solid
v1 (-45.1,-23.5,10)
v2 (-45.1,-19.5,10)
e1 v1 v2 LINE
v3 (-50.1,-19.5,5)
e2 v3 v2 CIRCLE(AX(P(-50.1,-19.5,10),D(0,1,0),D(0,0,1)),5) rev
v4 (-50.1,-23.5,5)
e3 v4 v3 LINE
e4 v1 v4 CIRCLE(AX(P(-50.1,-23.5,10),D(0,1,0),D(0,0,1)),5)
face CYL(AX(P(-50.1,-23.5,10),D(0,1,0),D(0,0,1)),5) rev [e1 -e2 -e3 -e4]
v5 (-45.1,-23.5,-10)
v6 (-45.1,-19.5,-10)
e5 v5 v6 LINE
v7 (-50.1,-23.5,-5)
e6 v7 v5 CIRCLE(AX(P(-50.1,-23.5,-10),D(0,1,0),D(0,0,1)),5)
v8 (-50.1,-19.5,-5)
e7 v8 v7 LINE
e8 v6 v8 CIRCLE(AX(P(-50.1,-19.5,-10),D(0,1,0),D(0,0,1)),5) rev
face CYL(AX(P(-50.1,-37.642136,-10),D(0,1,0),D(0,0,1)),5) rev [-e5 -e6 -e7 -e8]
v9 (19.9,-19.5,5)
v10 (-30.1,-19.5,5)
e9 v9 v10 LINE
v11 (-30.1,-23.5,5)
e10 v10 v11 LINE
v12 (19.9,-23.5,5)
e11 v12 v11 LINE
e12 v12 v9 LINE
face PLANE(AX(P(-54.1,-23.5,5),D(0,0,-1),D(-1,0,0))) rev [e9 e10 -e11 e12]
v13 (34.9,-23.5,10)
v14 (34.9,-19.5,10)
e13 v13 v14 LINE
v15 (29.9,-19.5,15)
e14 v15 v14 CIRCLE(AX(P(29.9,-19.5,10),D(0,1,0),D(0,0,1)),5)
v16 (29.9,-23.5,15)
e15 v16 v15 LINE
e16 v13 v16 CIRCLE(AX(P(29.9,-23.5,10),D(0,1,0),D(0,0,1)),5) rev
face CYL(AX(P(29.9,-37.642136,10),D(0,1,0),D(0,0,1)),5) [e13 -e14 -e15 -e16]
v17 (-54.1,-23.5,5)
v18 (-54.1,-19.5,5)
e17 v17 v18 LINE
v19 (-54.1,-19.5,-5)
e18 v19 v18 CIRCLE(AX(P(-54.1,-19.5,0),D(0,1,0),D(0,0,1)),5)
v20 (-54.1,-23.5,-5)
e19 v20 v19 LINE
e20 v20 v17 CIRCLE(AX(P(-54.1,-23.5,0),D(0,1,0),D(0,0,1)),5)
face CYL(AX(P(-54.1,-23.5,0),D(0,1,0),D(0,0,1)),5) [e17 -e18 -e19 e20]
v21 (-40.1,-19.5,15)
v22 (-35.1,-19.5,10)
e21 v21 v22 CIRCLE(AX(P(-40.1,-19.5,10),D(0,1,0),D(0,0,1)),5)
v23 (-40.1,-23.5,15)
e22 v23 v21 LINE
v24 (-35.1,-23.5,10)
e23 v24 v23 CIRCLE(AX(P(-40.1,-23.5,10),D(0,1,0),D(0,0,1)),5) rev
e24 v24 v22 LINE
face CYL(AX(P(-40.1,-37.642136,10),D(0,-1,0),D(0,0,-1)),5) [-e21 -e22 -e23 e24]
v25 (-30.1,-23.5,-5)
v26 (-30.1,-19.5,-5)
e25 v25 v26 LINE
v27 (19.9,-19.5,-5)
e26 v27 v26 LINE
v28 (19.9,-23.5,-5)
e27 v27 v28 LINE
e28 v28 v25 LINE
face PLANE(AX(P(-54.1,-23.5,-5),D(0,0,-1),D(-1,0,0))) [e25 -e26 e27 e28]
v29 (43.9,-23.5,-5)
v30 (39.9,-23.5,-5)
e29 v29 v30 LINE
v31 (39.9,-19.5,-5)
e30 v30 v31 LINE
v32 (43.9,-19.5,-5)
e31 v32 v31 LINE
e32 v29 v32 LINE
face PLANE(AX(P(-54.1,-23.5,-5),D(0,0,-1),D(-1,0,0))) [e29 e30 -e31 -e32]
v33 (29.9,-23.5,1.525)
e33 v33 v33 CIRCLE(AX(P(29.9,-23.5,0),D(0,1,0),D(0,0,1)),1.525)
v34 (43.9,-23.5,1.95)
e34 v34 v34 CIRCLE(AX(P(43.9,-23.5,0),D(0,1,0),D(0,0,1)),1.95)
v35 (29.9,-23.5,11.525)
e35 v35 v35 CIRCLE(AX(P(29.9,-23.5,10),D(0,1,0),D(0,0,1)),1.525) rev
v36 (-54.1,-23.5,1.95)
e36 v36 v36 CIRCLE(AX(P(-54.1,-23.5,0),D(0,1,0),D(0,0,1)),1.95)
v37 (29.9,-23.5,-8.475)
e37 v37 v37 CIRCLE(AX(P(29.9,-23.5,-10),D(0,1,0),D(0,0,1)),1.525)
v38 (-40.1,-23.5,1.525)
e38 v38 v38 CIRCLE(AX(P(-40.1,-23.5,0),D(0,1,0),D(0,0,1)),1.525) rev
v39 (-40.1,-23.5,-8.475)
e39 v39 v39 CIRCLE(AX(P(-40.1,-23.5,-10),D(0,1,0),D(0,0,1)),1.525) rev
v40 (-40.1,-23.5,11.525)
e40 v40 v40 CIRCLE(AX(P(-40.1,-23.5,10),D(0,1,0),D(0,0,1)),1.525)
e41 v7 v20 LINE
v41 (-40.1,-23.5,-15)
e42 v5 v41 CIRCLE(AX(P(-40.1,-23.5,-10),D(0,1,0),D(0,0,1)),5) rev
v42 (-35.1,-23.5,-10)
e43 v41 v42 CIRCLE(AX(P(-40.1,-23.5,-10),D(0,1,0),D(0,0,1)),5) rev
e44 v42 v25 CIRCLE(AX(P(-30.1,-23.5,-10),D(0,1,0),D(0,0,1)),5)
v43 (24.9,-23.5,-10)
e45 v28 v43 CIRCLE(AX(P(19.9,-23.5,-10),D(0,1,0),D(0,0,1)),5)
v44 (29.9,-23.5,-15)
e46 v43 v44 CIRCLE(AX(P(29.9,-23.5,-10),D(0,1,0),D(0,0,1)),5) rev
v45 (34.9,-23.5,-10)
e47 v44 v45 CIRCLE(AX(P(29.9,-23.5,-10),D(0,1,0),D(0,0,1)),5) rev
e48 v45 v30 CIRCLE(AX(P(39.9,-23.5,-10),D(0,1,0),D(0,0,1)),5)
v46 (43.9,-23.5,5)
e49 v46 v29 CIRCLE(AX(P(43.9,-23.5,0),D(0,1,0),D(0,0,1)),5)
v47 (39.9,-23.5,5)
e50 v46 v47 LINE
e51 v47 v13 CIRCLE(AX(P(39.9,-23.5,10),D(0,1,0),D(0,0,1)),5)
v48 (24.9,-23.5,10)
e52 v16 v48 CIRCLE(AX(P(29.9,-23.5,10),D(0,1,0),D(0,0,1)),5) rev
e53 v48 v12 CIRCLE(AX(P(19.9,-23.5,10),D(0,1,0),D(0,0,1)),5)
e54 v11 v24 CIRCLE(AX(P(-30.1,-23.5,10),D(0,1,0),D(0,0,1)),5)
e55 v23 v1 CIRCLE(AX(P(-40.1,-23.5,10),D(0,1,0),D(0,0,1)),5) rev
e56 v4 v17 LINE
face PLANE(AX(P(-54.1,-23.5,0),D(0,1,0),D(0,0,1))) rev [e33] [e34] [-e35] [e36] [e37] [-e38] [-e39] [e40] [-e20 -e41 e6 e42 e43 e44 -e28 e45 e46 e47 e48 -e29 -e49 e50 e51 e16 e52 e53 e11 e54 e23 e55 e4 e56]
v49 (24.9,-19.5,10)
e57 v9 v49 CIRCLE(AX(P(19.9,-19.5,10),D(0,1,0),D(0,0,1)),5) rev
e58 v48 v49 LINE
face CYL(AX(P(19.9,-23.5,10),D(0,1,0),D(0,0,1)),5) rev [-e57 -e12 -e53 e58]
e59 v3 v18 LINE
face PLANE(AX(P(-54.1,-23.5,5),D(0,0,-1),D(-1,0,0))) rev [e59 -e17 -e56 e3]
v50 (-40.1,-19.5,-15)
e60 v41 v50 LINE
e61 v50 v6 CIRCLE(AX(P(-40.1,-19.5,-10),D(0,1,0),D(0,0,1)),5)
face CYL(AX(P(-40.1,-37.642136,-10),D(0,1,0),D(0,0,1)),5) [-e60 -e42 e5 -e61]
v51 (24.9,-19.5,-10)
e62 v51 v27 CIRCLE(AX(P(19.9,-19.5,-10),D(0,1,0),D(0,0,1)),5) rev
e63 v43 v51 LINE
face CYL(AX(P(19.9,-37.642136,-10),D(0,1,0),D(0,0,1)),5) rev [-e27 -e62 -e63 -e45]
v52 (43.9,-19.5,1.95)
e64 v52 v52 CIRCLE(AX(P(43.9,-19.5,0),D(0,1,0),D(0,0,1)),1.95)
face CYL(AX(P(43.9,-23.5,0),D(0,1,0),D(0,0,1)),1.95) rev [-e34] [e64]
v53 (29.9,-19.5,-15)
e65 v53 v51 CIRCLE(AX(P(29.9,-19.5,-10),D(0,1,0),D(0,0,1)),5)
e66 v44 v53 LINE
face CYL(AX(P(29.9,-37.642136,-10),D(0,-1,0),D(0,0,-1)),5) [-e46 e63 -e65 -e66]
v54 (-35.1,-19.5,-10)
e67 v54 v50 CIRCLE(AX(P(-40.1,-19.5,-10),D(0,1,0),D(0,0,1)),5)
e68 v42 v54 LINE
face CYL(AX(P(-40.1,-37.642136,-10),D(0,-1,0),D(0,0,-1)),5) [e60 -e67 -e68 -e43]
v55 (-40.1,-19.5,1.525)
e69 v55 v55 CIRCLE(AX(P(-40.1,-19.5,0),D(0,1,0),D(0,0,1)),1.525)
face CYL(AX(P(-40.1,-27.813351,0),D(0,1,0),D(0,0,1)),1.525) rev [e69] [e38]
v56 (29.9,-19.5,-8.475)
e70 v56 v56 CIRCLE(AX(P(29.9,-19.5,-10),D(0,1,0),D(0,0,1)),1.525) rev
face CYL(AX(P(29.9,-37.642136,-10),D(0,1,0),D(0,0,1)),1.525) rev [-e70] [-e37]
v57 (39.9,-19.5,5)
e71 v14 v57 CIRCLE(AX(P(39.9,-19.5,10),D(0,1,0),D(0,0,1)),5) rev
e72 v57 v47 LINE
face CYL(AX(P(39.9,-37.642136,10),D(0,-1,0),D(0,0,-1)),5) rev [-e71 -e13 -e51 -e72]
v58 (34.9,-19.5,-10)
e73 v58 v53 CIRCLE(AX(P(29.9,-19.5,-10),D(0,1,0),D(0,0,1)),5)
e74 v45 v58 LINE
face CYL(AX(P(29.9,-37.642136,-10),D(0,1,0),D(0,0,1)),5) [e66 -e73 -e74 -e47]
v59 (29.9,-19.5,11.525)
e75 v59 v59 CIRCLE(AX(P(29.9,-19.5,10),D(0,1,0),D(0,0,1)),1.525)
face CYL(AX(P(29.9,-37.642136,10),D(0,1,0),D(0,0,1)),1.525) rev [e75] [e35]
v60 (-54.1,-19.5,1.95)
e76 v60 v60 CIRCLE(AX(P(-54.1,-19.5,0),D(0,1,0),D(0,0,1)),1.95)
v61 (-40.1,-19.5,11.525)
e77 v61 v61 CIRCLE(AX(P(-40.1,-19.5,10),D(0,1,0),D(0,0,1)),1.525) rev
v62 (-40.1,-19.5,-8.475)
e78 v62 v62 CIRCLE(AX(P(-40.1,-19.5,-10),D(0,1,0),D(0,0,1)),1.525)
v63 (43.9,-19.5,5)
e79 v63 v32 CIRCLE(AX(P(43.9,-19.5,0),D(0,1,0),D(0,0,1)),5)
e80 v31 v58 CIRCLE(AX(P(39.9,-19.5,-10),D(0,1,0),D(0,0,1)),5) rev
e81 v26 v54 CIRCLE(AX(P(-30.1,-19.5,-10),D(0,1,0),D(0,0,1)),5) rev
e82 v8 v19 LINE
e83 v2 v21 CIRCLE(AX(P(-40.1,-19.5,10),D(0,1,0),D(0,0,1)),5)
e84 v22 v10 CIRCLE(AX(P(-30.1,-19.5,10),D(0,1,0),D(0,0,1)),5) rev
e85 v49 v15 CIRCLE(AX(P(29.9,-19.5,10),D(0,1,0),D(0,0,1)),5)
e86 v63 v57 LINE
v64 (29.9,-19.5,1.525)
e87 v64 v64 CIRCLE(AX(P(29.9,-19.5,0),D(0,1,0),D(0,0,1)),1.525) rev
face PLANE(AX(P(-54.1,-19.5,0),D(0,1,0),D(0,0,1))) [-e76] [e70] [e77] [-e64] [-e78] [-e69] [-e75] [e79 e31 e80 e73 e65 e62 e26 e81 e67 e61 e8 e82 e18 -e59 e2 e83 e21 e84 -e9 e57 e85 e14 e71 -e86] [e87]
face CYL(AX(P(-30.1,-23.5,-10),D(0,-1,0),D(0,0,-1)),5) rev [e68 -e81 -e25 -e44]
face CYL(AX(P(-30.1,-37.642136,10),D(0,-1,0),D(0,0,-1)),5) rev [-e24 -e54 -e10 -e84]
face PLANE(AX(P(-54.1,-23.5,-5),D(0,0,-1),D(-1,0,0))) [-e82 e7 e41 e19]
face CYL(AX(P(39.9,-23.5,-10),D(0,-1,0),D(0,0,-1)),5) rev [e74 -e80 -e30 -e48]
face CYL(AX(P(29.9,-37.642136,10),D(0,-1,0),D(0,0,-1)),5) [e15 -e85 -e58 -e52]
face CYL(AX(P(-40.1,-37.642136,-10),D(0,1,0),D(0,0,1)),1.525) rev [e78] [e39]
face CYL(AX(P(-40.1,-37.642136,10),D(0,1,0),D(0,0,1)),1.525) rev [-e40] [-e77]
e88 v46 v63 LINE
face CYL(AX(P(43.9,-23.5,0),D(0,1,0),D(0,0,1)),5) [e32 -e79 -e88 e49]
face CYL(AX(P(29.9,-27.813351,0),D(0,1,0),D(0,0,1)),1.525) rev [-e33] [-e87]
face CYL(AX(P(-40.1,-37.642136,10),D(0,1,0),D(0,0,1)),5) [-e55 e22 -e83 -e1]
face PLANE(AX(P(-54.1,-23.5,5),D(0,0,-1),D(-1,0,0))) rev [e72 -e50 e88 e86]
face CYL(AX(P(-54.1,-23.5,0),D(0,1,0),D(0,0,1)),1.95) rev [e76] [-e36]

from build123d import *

# Parameters (mm, degrees)
BOSS_EXTRUDE1_START = -19.5
SKETCH1_R           = 1.95
BOSS_EXTRUDE1_DEPTH = 4
SKETCH2_W           = 10
SKETCH2_H           = 10
SKETCH2_R           = 1.525
BOSS_EXTRUDE2_DEPTH = 4
SKETCH2_3_R         = 1.525
CUT_EXTRUDE1_DEPTH  = 4
FILLET1_START       = -24
FILLET1_DEPTH       = 5
FILLET1_START_2     = -23.5
FILLET1_2_DEPTH     = 4


with BuildPart() as part:
    # Sketch1 → Boss-Extrude1 (new body)
    with BuildSketch(Plane(origin=(0, 0, 0), x_dir=(1, 0, 0), z_dir=(0, 1, 0)).offset(BOSS_EXTRUDE1_START)):
        with BuildLine():
            Line((43.9, 5), (-54.1, 5))
            ThreePointArc((-54.1, 5), (-59.1, 0), (-54.1, -5))
            Line((-54.1, -5), (43.9, -5))
            ThreePointArc((43.9, -5), (48.9, 0), (43.9, 5))
        make_face()
        with Locations(Location((43.9, 0, 0), (0, 0, 270))):
            Circle(SKETCH1_R, mode=Mode.SUBTRACT)
        with Locations(Location((-54.1, 0, 0), (0, 0, 270))):
            Circle(SKETCH1_R, mode=Mode.SUBTRACT)
    extrude(amount=-BOSS_EXTRUDE1_DEPTH)

    # Sketch2 → Boss-Extrude2 (add)
    # profile 1 of 4: a face of its own
    with BuildSketch(Plane(origin=(0, -19.5, 0), x_dir=(1, 0, 0), z_dir=(0, 1, 0))):
        with Locations((-40.1, -10)):
            Rectangle(SKETCH2_W, SKETCH2_H)
        with Locations(Location((-40.1, -10, 0), (0, 0, 270))):
            Circle(SKETCH2_R, mode=Mode.SUBTRACT)
    # profile 2 of 4: a face of its own
    with BuildSketch(Plane(origin=(0, -19.5, 0), x_dir=(1, 0, 0), z_dir=(0, 1, 0))):
        with Locations((-40.1, 10)):
            Rectangle(SKETCH2_W, SKETCH2_H)
        with Locations(Location((-40.1, 10, 0), (0, 0, 270))):
            Circle(SKETCH2_R, mode=Mode.SUBTRACT)
    # profile 3 of 4: a face of its own
    with BuildSketch(Plane(origin=(0, -19.5, 0), x_dir=(1, 0, 0), z_dir=(0, 1, 0))):
        with Locations((29.9, 10)):
            Rectangle(SKETCH2_W, SKETCH2_H)
        with Locations(Location((29.9, 10, 0), (0, 0, 270))):
            Circle(SKETCH2_R, mode=Mode.SUBTRACT)
    # profile 4 of 4: a face of its own
    with BuildSketch(Plane(origin=(0, -19.5, 0), x_dir=(1, 0, 0), z_dir=(0, 1, 0))):
        with Locations((29.9, -10)):
            Rectangle(SKETCH2_W, SKETCH2_H)
        with Locations(Location((29.9, -10, 0), (0, 0, 270))):
            Circle(SKETCH2_R, mode=Mode.SUBTRACT)
    extrude(amount=-BOSS_EXTRUDE2_DEPTH)

    # Sketch2<3> → Cut-Extrude1 (cut)
    with BuildSketch(Plane(origin=(0, -19.5, 0), x_dir=(1, 0, 0), z_dir=(0, 1, 0))):
        with Locations(Location((29.9, 0, 0), (0, 0, 270))):
            Circle(SKETCH2_3_R)
        with Locations(Location((-40.1, 0, 0), (0, 0, 270))):
            Circle(SKETCH2_3_R)
    extrude(amount=-CUT_EXTRUDE1_DEPTH, mode=Mode.SUBTRACT)

    # Fillet1: read off the stored shape, not the designer's step
    # Fillet1 outline → Fillet1 (cut)
    with BuildSketch(Plane(origin=(0, 0, 0), x_dir=(1, 0, 0), z_dir=(0, 1, 0)).offset(FILLET1_START)):
        with BuildLine():
            Line((34.9, -15), (34.9, -10))
            ThreePointArc((34.9, -10), (33.435533906, -13.535533906), (29.9, -15))
            Line((29.9, -15), (34.9, -15))
        make_face()
        with BuildLine():
            Line((-45.1, -15), (-40.1, -15))
            ThreePointArc((-40.1, -15), (-43.635533906, -13.535533906), (-45.1, -10))
            Line((-45.1, -10), (-45.1, -15))
        make_face()
        with BuildLine():
            Line((-35.1, -15), (-35.1, -10))
            ThreePointArc((-35.1, -10), (-36.564466094, -13.535533906), (-40.1, -15))
            Line((-40.1, -15), (-35.1, -15))
        make_face()
        with BuildLine():
            Line((24.9, -15), (29.9, -15))
            ThreePointArc((29.9, -15), (26.364466094, -13.535533906), (24.9, -10))
            Line((24.9, -10), (24.9, -15))
        make_face()
        with BuildLine():
            Line((34.9, 15), (29.9, 15))
            ThreePointArc((29.9, 15), (33.435533906, 13.535533906), (34.9, 10))
            Line((34.9, 10), (34.9, 15))
        make_face()
        with BuildLine():
            Line((24.9, 15), (24.9, 10))
            ThreePointArc((24.9, 10), (26.364466094, 13.535533906), (29.9, 15))
            Line((29.9, 15), (24.9, 15))
        make_face()
        with BuildLine():
            ThreePointArc((-45.1, 10), (-43.635533906, 13.535533906), (-40.1, 15))
            Line((-40.1, 15), (-45.1, 15))
            Line((-45.1, 15), (-45.1, 10))
        make_face()
        with BuildLine():
            ThreePointArc((-40.1, 15), (-36.564466094, 13.535533906), (-35.1, 10))
            Line((-35.1, 10), (-35.1, 15))
            Line((-35.1, 15), (-40.1, 15))
        make_face()
    extrude(amount=FILLET1_DEPTH, mode=Mode.SUBTRACT)

    # Fillet1 2 outline → Fillet1 2 (add)
    with BuildSketch(Plane(origin=(0, 0, 0), x_dir=(1, 0, 0), z_dir=(0, 1, 0)).offset(FILLET1_START_2)):
        with BuildLine():
            Line((34.9, -5), (34.9, -10))
            ThreePointArc((34.9, -10), (36.364466094, -6.464466094), (39.9, -5))
            Line((39.9, -5), (34.9, -5))
        make_face()
        with BuildLine():
            ThreePointArc((-50.1, -5), (-46.564466094, -6.464466094), (-45.1, -10))
            Line((-45.1, -10), (-45.1, -5))
            Line((-45.1, -5), (-50.1, -5))
        make_face()
        with BuildLine():
            ThreePointArc((-35.1, -10), (-33.635533906, -6.464466094), (-30.1, -5))
            Line((-30.1, -5), (-35.1, -5))
            Line((-35.1, -5), (-35.1, -10))
        make_face()
        with BuildLine():
            ThreePointArc((19.9, -5), (23.435533906, -6.464466094), (24.9, -10))
            Line((24.9, -10), (24.9, -5))
            Line((24.9, -5), (19.9, -5))
        make_face()
        with BuildLine():
            ThreePointArc((39.9, 5), (36.364466094, 6.464466094), (34.9, 10))
            Line((34.9, 10), (34.9, 5))
            Line((34.9, 5), (39.9, 5))
        make_face()
        with BuildLine():
            Line((-45.1, 5), (-45.1, 10))
            ThreePointArc((-45.1, 10), (-46.564466094, 6.464466094), (-50.1, 5))
            Line((-50.1, 5), (-45.1, 5))
        make_face()
        with BuildLine():
            Line((-35.1, 5), (-30.1, 5))
            ThreePointArc((-30.1, 5), (-33.635533906, 6.464466094), (-35.1, 10))
            Line((-35.1, 10), (-35.1, 5))
        make_face()
        with BuildLine():
            ThreePointArc((24.9, 10), (23.435533906, 6.464466094), (19.9, 5))
            Line((19.9, 5), (24.9, 5))
            Line((24.9, 5), (24.9, 10))
        make_face()
    extrude(amount=FILLET1_2_DEPTH)


solid = part.part
